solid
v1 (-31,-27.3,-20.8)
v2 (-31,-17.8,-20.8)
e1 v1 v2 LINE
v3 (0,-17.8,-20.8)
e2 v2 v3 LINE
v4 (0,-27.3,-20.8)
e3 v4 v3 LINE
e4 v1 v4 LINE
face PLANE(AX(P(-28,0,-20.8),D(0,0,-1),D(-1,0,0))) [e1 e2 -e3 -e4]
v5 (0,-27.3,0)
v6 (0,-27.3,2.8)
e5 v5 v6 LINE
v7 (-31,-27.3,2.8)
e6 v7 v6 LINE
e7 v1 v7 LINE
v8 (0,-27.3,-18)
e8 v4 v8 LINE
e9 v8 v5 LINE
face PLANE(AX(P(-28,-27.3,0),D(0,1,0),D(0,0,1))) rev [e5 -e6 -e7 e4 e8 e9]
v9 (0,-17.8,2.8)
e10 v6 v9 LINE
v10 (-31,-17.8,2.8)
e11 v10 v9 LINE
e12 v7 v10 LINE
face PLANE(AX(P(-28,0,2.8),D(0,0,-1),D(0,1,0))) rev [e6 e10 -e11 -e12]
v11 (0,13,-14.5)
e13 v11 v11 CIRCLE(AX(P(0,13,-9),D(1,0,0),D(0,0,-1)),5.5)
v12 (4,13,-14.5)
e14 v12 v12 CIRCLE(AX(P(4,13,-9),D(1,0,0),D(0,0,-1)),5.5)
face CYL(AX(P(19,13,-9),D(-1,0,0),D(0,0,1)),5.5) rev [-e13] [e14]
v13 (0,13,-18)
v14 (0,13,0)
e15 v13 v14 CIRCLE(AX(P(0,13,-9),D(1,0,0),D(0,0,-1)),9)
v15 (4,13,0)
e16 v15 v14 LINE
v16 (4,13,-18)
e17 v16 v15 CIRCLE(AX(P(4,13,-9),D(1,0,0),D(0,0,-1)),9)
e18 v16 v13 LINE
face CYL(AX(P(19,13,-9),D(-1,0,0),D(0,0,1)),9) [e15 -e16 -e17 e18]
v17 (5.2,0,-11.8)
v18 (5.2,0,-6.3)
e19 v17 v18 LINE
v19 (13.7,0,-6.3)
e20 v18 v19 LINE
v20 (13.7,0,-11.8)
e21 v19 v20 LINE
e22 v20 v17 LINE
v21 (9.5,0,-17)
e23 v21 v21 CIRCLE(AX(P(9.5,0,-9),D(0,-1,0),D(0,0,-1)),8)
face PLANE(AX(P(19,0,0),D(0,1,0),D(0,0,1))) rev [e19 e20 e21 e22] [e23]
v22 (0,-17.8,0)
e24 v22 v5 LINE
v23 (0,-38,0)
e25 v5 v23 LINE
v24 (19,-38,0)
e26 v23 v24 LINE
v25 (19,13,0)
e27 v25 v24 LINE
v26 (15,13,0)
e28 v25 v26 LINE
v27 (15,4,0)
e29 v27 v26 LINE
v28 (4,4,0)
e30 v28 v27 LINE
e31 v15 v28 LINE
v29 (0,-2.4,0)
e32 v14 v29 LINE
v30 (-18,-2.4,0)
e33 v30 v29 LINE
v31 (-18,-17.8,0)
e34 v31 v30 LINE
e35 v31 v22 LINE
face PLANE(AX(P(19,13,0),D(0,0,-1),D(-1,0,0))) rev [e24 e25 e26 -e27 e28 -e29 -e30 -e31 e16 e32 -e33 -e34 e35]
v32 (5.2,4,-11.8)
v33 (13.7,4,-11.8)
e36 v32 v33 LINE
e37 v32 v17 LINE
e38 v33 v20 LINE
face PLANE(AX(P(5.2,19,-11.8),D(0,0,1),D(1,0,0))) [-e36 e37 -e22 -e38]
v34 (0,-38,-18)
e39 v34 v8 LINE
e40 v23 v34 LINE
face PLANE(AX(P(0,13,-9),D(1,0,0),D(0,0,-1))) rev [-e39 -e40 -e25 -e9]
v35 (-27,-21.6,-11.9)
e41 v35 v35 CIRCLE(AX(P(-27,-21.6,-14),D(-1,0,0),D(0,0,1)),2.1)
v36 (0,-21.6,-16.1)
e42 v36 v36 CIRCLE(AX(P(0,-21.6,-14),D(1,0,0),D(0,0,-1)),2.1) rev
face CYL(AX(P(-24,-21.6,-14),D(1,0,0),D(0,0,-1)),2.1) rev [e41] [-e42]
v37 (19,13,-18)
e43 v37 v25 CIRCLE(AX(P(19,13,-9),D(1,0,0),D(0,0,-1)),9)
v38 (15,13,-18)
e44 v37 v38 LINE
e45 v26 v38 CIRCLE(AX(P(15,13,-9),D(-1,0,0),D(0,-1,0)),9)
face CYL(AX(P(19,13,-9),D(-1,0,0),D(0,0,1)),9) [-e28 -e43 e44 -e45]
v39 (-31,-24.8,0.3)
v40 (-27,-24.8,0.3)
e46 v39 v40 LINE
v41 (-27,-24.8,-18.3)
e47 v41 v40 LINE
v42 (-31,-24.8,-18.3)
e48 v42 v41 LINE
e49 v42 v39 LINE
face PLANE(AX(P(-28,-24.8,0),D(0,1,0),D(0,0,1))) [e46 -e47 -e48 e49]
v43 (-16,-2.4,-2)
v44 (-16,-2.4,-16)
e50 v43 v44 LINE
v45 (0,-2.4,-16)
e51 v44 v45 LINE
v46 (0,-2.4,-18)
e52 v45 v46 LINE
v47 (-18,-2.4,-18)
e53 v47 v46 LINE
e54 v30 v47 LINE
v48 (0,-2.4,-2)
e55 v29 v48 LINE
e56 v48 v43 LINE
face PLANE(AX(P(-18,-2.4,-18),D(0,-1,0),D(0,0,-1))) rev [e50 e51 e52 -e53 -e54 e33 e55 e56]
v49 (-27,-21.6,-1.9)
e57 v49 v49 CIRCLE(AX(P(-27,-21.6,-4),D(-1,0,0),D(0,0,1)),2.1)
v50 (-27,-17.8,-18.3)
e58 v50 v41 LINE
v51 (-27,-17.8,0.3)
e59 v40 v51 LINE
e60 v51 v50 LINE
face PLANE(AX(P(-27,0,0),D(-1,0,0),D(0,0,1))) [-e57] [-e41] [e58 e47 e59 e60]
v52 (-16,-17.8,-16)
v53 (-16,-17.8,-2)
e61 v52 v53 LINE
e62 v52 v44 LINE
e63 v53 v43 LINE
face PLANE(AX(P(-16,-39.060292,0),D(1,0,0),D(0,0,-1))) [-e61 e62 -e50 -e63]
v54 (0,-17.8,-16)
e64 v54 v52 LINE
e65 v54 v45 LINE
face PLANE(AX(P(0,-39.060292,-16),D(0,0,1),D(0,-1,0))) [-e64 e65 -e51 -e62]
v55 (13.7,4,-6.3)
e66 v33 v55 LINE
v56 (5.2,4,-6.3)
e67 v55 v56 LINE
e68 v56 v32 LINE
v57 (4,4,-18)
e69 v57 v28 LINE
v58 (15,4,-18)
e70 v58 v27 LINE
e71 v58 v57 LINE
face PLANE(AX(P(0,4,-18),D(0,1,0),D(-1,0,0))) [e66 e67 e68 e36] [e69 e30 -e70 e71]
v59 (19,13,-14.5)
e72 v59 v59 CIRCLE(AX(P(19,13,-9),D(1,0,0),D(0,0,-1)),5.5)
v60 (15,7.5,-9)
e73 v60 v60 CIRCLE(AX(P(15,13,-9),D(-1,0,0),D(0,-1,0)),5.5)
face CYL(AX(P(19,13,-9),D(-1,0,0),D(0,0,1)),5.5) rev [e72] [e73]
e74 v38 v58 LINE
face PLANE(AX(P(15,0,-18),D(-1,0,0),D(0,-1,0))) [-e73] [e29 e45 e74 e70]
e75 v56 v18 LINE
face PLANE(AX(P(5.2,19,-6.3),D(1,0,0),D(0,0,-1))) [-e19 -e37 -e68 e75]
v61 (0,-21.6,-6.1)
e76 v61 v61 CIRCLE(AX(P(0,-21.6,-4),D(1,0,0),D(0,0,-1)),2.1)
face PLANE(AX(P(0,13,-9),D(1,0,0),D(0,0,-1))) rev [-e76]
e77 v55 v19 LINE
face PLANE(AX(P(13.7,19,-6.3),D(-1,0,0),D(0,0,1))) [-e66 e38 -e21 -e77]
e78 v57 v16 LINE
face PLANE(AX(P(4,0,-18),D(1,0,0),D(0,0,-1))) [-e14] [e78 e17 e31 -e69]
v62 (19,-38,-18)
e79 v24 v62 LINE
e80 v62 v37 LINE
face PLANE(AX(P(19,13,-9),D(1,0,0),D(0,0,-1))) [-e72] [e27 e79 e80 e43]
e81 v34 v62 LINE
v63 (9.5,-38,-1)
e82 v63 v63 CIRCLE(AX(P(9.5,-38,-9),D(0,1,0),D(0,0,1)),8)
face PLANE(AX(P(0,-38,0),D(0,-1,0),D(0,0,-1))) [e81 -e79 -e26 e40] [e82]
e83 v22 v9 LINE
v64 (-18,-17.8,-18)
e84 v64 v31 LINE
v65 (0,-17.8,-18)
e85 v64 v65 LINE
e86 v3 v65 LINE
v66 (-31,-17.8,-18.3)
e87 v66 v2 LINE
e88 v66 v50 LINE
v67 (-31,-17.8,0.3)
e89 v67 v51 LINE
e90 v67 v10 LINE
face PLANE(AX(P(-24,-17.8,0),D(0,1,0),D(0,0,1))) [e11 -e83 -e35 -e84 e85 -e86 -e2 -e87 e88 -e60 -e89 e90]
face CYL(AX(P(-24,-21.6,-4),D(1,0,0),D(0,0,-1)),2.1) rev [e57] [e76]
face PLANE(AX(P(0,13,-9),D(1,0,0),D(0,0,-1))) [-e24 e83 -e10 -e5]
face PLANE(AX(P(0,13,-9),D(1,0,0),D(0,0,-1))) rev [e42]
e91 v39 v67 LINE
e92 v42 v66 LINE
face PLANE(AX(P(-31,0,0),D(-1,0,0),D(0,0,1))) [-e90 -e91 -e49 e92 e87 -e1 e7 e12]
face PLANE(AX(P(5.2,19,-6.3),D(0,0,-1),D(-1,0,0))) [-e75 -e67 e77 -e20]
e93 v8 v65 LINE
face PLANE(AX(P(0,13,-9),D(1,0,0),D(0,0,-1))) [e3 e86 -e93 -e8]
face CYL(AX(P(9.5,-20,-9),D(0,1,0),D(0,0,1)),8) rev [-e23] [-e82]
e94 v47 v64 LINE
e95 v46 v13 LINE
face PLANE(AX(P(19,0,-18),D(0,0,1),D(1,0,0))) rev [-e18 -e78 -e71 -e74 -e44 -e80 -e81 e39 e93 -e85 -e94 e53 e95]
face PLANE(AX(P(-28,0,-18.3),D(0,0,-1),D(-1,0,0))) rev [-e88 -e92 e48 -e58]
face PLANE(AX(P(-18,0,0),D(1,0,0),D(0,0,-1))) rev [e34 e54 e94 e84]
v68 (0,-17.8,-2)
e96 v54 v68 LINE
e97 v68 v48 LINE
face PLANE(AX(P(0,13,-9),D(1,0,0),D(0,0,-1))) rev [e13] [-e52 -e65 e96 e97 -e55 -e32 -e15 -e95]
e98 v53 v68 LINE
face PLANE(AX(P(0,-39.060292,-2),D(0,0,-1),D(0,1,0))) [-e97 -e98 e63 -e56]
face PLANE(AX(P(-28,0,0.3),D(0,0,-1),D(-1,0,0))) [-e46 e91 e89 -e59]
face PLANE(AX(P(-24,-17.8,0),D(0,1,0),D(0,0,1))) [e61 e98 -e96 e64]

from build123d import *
from build123d.topology import SkipClean

# Parameters (mm, degrees)
SKETCH2_R                        = 5.5
BOSS_EXTRUDE1_DEPTH              = 19
CUT_EXTRUDE1_DEPTH               = 35.190641995
CUT_EXTRUDE1_DEPTH_BACK          = 35.190641995
SKETCH3_W                        = 11
SKETCH3_H                        = 18
SKETCH4_W                        = 8.5
SKETCH4_H                        = 5.5
CUT_EXTRUDE4_DEPTH               = 19
SKETCH5_W                        = 19
SKETCH5_H                        = 18
SKETCH5_R                        = 8
BOSS_EXTRUDE4_DEPTH              = 20
F_3DSKETCH1_R                    = 8
BOSS_EXTRUDE5_DEPTH              = 18
BOSS_EXTRUDE8_DEPTH              = 10
BOSS_EXTRUDE19_REACH             = 53.078
SKETCH8_W                        = 18.6
SKETCH8_H                        = 7
SKETCH8_R                        = 2.1
BOSS_EXTRUDE19_DIRECTION_2_DEPTH = 14
SKETCH8_13_W                     = 2
SKETCH8_13_H                     = 2.5
SKETCH8_13_H_2                   = 0.5
SKETCH8_13_R                     = 2.1
CUT_EXTRUDE7_DEPTH               = 10
BOSS_EXTRUDE20_DEPTH             = 18
BOSS_EXTRUDE20_DEPTH_BACK        = 10
BOSS_EXTRUDE22_START             = 3
SKETCH11_W                       = 18.6
SKETCH11_H                       = 7
SKETCH11_R                       = 2.1
BOSS_EXTRUDE22_DEPTH             = 3
BOSS_EXTRUDE23_DEPTH             = 21
SKETCH12_W                       = 18
SKETCH12_H                       = 15.4
BOSS_EXTRUDE26_DEPTH             = 18
SKETCH13_W                       = 14
SKETCH13_H                       = 14
SKETCH13_W_2                     = 2
CUT_EXTRUDE8_DEPTH               = 15.4


with BuildPart() as part:
    # Sketch2 → Boss-Extrude1 (new body)
    with BuildSketch(Plane(origin=(0, 0, 0), x_dir=(0, 0, -1), z_dir=(1, 0, 0))):
        with BuildLine():
            Line((0, 0), (18, 0))
            Line((18, 0), (18, 13))
            ThreePointArc((18, 13), (9, 22), (0, 13))
            Line((0, 13), (0, 0))
        make_face()
        with Locations((9, 13)):
            Circle(SKETCH2_R, mode=Mode.SUBTRACT)
    extrude(amount=BOSS_EXTRUDE1_DEPTH)

    # Sketch3 → Cut-Extrude1 (cut, two sides: drawn at the far end of the back side and taken through both)
    with BuildSketch(Plane.XY.offset(-CUT_EXTRUDE1_DEPTH_BACK)):
        with Locations((9.5, 13)):
            Rectangle(SKETCH3_W, SKETCH3_H)
    extrude(amount=CUT_EXTRUDE1_DEPTH + CUT_EXTRUDE1_DEPTH_BACK, mode=Mode.SUBTRACT)

    # Sketch4 → Cut-Extrude4 (cut)
    with BuildSketch(Plane(origin=(0, 0, 0), x_dir=(1, 0, 0), z_dir=(0, 1, 0))):
        with Locations((9.45, 9.05)):
            Rectangle(SKETCH4_W, SKETCH4_H)
    extrude(amount=CUT_EXTRUDE4_DEPTH, mode=Mode.SUBTRACT)

    # Sketch5 → Boss-Extrude4 (add)
    with BuildSketch(Plane.XZ):
        with Locations((9.5, -9)):
            Rectangle(SKETCH5_W, SKETCH5_H)
        with Locations(Location((9.5, -9, 0), (0, 0, 270))):
            Circle(SKETCH5_R, mode=Mode.SUBTRACT)
    extrude(amount=BOSS_EXTRUDE4_DEPTH)

    # 3DSketch1 → Boss-Extrude5 (add)
    with BuildSketch(Plane(origin=(0, -20, 0), x_dir=(0.7259526839058267, 0, -0.687744647910783), z_dir=(0, 1, 0))):
        Polygon((0, 0), (12.379403662, 13.06714831), (26.172504657, 0), (13.793100994, -13.06714831), align=None)
        with Locations(Location((13.086252328, 0, 0), (0, 0, 226.548157699))):
            Circle(F_3DSKETCH1_R, mode=Mode.SUBTRACT)
    extrude(amount=-BOSS_EXTRUDE5_DEPTH)

    # Sketch7 → Boss-Extrude8 (add)
    with BuildSketch(Plane.ZY):
        Polygon((0, -23.8), (0, -14.8), (-2, -14.8), (-2, -22.8), (-7, -22.8), (-7, -24.8), (0, -24.8), align=None)
        Polygon((-16, -14.8), (-18, -14.8), (-18, -23.8), (-18, -24.8), (-11, -24.8), (-11, -22.8), (-16, -22.8), align=None)
    extrude(amount=BOSS_EXTRUDE8_DEPTH)

    # Boss-Extrude19: up to this face of the body (flat: up to its plane)
    boss_extrude19_end = Plane(part.part.faces().sort_by_distance((0, -10.449751669, -9))[0])
    # Sketch8 → Boss-Extrude19 (add, up to the picked face)
    with BuildSketch(Plane.ZY.offset(10), mode=Mode.PRIVATE) as boss_extrude19_sk1:
        with Locations((-9, -21.3)):
            Rectangle(SKETCH8_W, SKETCH8_H)
        with Locations(Location((-14, -21.6, 0), (0, 0, 162.247209838))):
            Circle(SKETCH8_R, mode=Mode.SUBTRACT)
        with Locations(Location((-4, -21.6, 0), (0, 0, 214.849904579))):
            Circle(SKETCH8_R, mode=Mode.SUBTRACT)
    boss_extrude19_tool1 = split(extrude(boss_extrude19_sk1.sketch, amount=-BOSS_EXTRUDE19_REACH, mode=Mode.PRIVATE), bisect_by=boss_extrude19_end, keep=Keep.BOTH, mode=Mode.PRIVATE)
    add(boss_extrude19_tool1.solids().sort_by(Axis((-10, -21.218894, -9), (1, 0, 0)))[0])

    # Sketch8 → Boss-Extrude19 direction 2 (add)
    with SkipClean():  # the faces are left unmerged after this step: merging them gives an invalid solid
        with BuildSketch(Plane.ZY.offset(10)):
            with Locations((-9, -21.3)):
                Rectangle(SKETCH8_W, SKETCH8_H)
            with Locations(Location((-14, -21.6, 0), (0, 0, 162.247209838))):
                Circle(SKETCH8_R, mode=Mode.SUBTRACT)
            with Locations(Location((-4, -21.6, 0), (0, 0, 214.849904579))):
                Circle(SKETCH8_R, mode=Mode.SUBTRACT)
        extrude(amount=BOSS_EXTRUDE19_DIRECTION_2_DEPTH)
    add(part.part.scale(1), mode=Mode.REPLACE)  # the faces are merged on a copy

    # Sketch8<13> → Cut-Extrude7 (cut)
    with SkipClean():  # the faces are left unmerged after this step: merging them gives an invalid solid
        with BuildSketch(Plane.ZY.offset(10)):
            with Locations((-17, -16.55)):
                Rectangle(SKETCH8_13_W, SKETCH8_13_H)
            with Locations((-17, -15.05)):
                Rectangle(SKETCH8_13_W, SKETCH8_13_H_2)
            with Locations((-1, -16.55)):
                Rectangle(SKETCH8_13_W, SKETCH8_13_H)
            with Locations((-1, -15.05)):
                Rectangle(SKETCH8_13_W, SKETCH8_13_H_2)
            with Locations(Location((-14, -21.6, 0), (0, 0, 180))):
                Circle(SKETCH8_13_R)
            with Locations(Location((-4, -21.6, 0), (0, 0, 180))):
                Circle(SKETCH8_13_R)
        extrude(amount=-CUT_EXTRUDE7_DEPTH, mode=Mode.SUBTRACT)
    add(part.part.scale(1), mode=Mode.REPLACE)  # the faces are merged on a copy

    # Sketch8<14> → Boss-Extrude20 (add, two sides: drawn at the far end of the back side and taken through both)
    with BuildSketch(Plane.ZY.offset(10).offset(-BOSS_EXTRUDE20_DEPTH_BACK)):
        Polygon((-11, -24.8), (-18, -24.8), (-18.3, -24.8), (-18.3, -17.8), (-20.485605357, -17.8), (-20.8, -17.8), (-20.8, -27.3), (-18, -27.3), (0, -27.3), (2.8, -27.3), (2.8, -17.8), (0.3, -17.8), (0.3, -24.8), (0, -24.8), (-9, -24.8), align=None)
    extrude(amount=BOSS_EXTRUDE20_DEPTH + BOSS_EXTRUDE20_DEPTH_BACK)

    # Sketch11 → Boss-Extrude22 (add)
    with SkipClean():  # the faces are left unmerged after this step: merging them gives an invalid solid
        with BuildSketch(Plane.ZY.offset(24).offset(BOSS_EXTRUDE22_START)):
            with Locations((-9, -21.3)):
                Rectangle(SKETCH11_W, SKETCH11_H)
            with Locations(Location((-14, -21.6, 0), (0, 0, 180))):
                Circle(SKETCH11_R, mode=Mode.SUBTRACT)
            with Locations(Location((-4, -21.6, 0), (0, 0, 180))):
                Circle(SKETCH11_R, mode=Mode.SUBTRACT)
        extrude(amount=-BOSS_EXTRUDE22_DEPTH)
    add(part.part.scale(1), mode=Mode.REPLACE)  # the faces are merged on a copy

    # Sketch8<15> → Boss-Extrude23 (add)
    with BuildSketch(Plane.ZY.offset(10)):
        Polygon((-11, -24.8), (-18, -24.8), (-18.3, -24.8), (-18.3, -17.8), (-20.485605357, -17.8), (-20.8, -17.8), (-20.8, -27.3), (-18, -27.3), (0, -27.3), (2.8, -27.3), (2.8, -17.8), (0.3, -17.8), (0.3, -24.8), (0, -24.8), (-9, -24.8), align=None)
    extrude(amount=BOSS_EXTRUDE23_DEPTH)

    # Sketch12 → Boss-Extrude26 (add)
    with BuildSketch(Plane.ZY):
        with Locations((-9, -10.1)):
            Rectangle(SKETCH12_W, SKETCH12_H)
    extrude(amount=BOSS_EXTRUDE26_DEPTH)

    # Sketch13 → Cut-Extrude8 (cut)
    with BuildSketch(Plane(origin=(0, -2.4, 0), x_dir=(1, 0, 0), z_dir=(0, 1, 0))):
        with Locations((-9, 9)):
            Rectangle(SKETCH13_W, SKETCH13_H)
        with Locations((-1, 9)):
            Rectangle(SKETCH13_W_2, SKETCH13_H)
    extrude(amount=-CUT_EXTRUDE8_DEPTH, mode=Mode.SUBTRACT)


solid = part.part
